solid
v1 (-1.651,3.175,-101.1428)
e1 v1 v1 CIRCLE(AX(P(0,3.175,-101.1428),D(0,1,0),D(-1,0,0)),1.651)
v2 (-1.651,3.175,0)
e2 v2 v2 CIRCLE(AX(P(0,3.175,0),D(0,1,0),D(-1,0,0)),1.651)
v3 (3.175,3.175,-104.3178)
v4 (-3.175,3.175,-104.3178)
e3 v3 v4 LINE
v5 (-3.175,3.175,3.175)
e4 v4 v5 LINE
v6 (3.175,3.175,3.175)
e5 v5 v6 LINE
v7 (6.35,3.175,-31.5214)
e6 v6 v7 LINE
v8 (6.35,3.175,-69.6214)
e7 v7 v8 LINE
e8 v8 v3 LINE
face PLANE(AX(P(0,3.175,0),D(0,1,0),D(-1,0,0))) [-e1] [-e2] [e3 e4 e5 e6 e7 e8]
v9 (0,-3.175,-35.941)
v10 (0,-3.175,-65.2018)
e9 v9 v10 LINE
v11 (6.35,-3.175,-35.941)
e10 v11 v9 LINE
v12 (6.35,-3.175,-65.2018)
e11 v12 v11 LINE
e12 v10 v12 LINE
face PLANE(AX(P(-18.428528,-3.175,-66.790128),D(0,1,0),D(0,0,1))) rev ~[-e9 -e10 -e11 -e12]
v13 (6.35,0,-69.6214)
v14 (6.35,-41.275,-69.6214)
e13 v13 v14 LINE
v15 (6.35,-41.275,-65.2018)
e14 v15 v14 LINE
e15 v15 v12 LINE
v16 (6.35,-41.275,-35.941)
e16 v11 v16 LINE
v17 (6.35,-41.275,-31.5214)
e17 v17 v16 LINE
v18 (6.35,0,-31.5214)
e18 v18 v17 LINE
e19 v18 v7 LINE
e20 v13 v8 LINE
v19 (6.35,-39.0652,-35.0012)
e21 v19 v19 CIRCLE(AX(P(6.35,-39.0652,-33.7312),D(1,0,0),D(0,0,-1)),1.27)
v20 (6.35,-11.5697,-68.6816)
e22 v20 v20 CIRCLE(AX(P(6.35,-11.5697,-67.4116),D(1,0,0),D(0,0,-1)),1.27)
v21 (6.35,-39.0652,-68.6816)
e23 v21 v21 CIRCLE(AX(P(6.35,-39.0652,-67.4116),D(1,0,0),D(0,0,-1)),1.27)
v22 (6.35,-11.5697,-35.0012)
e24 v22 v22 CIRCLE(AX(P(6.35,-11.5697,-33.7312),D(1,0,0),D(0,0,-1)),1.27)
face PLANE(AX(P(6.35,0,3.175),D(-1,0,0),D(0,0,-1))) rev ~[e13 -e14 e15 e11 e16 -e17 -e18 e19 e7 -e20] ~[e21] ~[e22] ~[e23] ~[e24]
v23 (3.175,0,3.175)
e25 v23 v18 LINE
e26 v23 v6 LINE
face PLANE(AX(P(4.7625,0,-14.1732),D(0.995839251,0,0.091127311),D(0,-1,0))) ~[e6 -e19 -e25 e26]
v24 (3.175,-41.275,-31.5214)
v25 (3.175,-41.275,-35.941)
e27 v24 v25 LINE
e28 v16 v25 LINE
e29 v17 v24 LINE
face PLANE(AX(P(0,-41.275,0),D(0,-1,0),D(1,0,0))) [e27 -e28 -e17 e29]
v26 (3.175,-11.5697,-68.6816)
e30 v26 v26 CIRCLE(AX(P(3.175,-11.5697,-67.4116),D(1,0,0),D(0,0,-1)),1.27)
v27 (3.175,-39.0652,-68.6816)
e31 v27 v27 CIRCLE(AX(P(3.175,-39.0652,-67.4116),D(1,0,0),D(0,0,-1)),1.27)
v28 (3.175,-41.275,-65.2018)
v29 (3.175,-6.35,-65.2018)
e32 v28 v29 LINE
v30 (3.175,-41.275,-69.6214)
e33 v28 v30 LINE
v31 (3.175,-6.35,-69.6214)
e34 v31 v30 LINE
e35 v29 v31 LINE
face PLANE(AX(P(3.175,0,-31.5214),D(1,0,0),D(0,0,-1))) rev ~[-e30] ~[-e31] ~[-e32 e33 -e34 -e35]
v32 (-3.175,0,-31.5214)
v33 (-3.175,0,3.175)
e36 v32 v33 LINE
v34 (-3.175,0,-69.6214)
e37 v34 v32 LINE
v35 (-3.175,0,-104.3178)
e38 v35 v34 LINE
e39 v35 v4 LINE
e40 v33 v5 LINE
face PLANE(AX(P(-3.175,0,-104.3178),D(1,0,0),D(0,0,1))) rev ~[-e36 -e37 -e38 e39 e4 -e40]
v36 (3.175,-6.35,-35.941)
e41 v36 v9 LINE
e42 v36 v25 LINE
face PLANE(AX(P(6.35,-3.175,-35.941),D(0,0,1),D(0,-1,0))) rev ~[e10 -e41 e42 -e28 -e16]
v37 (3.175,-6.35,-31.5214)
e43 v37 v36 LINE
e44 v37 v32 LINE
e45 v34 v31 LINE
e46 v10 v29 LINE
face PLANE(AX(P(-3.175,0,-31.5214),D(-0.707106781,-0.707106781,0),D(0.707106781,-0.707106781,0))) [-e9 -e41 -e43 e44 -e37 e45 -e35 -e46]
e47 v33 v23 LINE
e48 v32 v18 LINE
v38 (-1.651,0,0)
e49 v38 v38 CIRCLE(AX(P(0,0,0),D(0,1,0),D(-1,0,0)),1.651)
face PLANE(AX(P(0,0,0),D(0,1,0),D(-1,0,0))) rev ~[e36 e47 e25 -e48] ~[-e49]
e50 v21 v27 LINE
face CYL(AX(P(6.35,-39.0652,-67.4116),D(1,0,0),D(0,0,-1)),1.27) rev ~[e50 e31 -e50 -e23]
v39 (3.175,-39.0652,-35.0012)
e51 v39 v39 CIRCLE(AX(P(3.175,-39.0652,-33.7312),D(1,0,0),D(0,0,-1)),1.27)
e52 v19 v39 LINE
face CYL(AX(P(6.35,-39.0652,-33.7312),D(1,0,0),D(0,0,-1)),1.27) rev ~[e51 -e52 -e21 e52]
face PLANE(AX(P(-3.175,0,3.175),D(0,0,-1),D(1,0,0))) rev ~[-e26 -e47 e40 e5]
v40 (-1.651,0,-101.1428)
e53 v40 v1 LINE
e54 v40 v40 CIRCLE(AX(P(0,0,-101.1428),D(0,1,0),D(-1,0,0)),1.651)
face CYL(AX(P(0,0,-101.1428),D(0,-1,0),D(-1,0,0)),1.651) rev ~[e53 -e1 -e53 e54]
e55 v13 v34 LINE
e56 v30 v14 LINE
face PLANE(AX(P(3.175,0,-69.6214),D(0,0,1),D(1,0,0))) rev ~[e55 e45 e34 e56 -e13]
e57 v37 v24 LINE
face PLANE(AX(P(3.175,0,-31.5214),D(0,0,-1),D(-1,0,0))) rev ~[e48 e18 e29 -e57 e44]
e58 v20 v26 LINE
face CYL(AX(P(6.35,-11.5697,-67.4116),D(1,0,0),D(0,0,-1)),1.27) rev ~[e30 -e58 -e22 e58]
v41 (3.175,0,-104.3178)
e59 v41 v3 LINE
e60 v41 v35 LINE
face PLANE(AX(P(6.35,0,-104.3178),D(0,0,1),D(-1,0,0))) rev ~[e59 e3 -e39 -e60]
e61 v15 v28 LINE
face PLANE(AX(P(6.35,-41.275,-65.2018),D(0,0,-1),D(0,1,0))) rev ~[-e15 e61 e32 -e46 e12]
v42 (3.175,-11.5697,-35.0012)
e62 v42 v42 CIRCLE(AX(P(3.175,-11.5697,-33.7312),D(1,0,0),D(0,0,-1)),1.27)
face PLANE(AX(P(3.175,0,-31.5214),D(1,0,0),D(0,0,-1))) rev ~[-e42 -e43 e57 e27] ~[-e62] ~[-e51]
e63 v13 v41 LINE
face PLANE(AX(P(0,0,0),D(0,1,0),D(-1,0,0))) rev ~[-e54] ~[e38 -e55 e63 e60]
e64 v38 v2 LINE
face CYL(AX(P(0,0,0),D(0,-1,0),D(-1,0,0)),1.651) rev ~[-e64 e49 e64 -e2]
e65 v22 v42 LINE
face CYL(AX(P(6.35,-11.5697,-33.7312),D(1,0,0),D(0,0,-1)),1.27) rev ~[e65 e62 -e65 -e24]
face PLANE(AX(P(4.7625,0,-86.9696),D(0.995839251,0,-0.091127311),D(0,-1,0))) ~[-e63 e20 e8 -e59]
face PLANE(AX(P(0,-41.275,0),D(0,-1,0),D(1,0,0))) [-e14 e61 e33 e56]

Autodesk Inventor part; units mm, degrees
ref_plane "YZ Plane" through (0, 0, 0) normal (1, 0, 0) x (0, 1, 0)
ref_plane "XZ Plane" through (0, 0, 0) normal (0, 1, 0) x (-1, 0, 0)
ref_plane "XY Plane" through (0, 0, 0) normal (0, 0, 1) x (1, 0, 0)
sketch "Sketch1" plane through (0, 0, 0) normal (0, 1, 0) x (-1, 0, 0)
  circle A0 centre (0, 0) radius 1.651
  circle A1 centre (0, -101.1428) radius 1.651
  line L0 (0, 0) -> (0, -101.1428) construction
  line L1 (3.175, 3.175) -> (-6.35, 3.175)
  line L2 (-6.35, 3.175) -> (-6.35, -104.3178)
  line L3 (-6.35, -104.3178) -> (3.175, -104.3178)
  line L4 (3.175, -104.3178) -> (3.175, 3.175)
  dimension "d0" = 3.302
  dimension "d1" = 101.1428
  dimension "d3" = 3.175
  dimension "d4" = 3.175
  dimension "d5" = 3.175
  dimension "d6" = 6.35
extrude "Extrusion1" add sketch "Sketch1" along normal blind 3.175
sketch "Sketch2" plane through (0, 0, 0) normal (0, -1, 0) x (1, 0, 0)
  line L0 (6.35, 3.175) -> (6.35, -104.3178) projected
  line L1 (6.35, -31.5214) -> (3.175, -31.5214)
  line L2 (3.175, -31.5214) -> (3.175, -69.6214)
  line L3 (3.175, -69.6214) -> (6.35, -69.6214)
  line L4 (6.35, -69.6214) -> (6.35, -31.5214)
  line L5 (-3.175, -104.3178) -> (-3.175, 3.175) construction
  line L6 (-3.175, -50.5714) -> (6.35, -50.5714) construction
  point P0 (0, 0)
  dimension "d9" = 38.1
  dimension "d10" = 3.175
extrude "Extrusion2" add sketch "Sketch2" along normal blind 41.275
sketch "Sketch3" plane through (6.35, 0, -104.3178) normal (1, 0, 0) x (0, 0, -1)
  circle A0 centre (-70.5866, -39.0652) radius 1.27
  circle A1 centre (-70.5866, -11.5697) radius 1.27
  circle A2 centre (-36.9062, -11.5697) radius 1.27
  circle A3 centre (-36.9062, -39.0652) radius 1.27
  line L0 (-70.5866, -11.5697) -> (-70.5866, -39.0652) construction
  line L1 (-70.5866, -39.0652) -> (-36.9062, -39.0652) construction
  line L2 (-36.9062, -39.0652) -> (-36.9062, -11.5697) construction
  line L3 (-36.9062, -11.5697) -> (-70.5866, -11.5697) construction
  line L4 (-34.6964, -41.275) -> (-72.7964, -41.275) construction
  line L5 (-53.7464, -41.275) -> (-53.7464, 0) construction
  line L6 (-34.6964, 0) -> (-72.7964, 0) construction
  line L7 (-68.3768, -41.275) -> (-39.116, -41.275)
  line L8 (-39.116, -41.275) -> (-39.116, -3.175)
  line L9 (-39.116, -3.175) -> (-68.3768, -3.175)
  line L10 (-68.3768, -3.175) -> (-68.3768, -41.275)
  line L11 (-72.7964, 0) -> (-72.7964, -41.275) projected
  point P0 (-104.3178, 0)
  dimension "d13" = 2.54
  dimension "d14" = 27.4955
  dimension "d15" = 33.6804
  dimension "d17" = 2.2098
  dimension "d18" = 2.2098
  dimension "d19" = 2.2098
  dimension "d20" = 2.2098
  dimension "d21" = 3.175
extrude "Extrusion3" cut sketch "Sketch3" against normal up to surface (3.175 mm away)
chamfer "Chamfer1" distance 6.35 angle 45 1 edges at (3.175, 0, -50.5714)
chamfer "Chamfer2" distance 3.175 distance2 34.6964 1 edges at (6.35, 1.5875, 3.175) measured on face at (0, 1.0583, 3.175)
chamfer "Chamfer3" distance 34.6964 distance2 3.175 1 edges at (6.35, 1.5875, -104.3178) measured on face at (6.35, 2.1167, -68.4869)
properties part number "grumpy camera mount"
